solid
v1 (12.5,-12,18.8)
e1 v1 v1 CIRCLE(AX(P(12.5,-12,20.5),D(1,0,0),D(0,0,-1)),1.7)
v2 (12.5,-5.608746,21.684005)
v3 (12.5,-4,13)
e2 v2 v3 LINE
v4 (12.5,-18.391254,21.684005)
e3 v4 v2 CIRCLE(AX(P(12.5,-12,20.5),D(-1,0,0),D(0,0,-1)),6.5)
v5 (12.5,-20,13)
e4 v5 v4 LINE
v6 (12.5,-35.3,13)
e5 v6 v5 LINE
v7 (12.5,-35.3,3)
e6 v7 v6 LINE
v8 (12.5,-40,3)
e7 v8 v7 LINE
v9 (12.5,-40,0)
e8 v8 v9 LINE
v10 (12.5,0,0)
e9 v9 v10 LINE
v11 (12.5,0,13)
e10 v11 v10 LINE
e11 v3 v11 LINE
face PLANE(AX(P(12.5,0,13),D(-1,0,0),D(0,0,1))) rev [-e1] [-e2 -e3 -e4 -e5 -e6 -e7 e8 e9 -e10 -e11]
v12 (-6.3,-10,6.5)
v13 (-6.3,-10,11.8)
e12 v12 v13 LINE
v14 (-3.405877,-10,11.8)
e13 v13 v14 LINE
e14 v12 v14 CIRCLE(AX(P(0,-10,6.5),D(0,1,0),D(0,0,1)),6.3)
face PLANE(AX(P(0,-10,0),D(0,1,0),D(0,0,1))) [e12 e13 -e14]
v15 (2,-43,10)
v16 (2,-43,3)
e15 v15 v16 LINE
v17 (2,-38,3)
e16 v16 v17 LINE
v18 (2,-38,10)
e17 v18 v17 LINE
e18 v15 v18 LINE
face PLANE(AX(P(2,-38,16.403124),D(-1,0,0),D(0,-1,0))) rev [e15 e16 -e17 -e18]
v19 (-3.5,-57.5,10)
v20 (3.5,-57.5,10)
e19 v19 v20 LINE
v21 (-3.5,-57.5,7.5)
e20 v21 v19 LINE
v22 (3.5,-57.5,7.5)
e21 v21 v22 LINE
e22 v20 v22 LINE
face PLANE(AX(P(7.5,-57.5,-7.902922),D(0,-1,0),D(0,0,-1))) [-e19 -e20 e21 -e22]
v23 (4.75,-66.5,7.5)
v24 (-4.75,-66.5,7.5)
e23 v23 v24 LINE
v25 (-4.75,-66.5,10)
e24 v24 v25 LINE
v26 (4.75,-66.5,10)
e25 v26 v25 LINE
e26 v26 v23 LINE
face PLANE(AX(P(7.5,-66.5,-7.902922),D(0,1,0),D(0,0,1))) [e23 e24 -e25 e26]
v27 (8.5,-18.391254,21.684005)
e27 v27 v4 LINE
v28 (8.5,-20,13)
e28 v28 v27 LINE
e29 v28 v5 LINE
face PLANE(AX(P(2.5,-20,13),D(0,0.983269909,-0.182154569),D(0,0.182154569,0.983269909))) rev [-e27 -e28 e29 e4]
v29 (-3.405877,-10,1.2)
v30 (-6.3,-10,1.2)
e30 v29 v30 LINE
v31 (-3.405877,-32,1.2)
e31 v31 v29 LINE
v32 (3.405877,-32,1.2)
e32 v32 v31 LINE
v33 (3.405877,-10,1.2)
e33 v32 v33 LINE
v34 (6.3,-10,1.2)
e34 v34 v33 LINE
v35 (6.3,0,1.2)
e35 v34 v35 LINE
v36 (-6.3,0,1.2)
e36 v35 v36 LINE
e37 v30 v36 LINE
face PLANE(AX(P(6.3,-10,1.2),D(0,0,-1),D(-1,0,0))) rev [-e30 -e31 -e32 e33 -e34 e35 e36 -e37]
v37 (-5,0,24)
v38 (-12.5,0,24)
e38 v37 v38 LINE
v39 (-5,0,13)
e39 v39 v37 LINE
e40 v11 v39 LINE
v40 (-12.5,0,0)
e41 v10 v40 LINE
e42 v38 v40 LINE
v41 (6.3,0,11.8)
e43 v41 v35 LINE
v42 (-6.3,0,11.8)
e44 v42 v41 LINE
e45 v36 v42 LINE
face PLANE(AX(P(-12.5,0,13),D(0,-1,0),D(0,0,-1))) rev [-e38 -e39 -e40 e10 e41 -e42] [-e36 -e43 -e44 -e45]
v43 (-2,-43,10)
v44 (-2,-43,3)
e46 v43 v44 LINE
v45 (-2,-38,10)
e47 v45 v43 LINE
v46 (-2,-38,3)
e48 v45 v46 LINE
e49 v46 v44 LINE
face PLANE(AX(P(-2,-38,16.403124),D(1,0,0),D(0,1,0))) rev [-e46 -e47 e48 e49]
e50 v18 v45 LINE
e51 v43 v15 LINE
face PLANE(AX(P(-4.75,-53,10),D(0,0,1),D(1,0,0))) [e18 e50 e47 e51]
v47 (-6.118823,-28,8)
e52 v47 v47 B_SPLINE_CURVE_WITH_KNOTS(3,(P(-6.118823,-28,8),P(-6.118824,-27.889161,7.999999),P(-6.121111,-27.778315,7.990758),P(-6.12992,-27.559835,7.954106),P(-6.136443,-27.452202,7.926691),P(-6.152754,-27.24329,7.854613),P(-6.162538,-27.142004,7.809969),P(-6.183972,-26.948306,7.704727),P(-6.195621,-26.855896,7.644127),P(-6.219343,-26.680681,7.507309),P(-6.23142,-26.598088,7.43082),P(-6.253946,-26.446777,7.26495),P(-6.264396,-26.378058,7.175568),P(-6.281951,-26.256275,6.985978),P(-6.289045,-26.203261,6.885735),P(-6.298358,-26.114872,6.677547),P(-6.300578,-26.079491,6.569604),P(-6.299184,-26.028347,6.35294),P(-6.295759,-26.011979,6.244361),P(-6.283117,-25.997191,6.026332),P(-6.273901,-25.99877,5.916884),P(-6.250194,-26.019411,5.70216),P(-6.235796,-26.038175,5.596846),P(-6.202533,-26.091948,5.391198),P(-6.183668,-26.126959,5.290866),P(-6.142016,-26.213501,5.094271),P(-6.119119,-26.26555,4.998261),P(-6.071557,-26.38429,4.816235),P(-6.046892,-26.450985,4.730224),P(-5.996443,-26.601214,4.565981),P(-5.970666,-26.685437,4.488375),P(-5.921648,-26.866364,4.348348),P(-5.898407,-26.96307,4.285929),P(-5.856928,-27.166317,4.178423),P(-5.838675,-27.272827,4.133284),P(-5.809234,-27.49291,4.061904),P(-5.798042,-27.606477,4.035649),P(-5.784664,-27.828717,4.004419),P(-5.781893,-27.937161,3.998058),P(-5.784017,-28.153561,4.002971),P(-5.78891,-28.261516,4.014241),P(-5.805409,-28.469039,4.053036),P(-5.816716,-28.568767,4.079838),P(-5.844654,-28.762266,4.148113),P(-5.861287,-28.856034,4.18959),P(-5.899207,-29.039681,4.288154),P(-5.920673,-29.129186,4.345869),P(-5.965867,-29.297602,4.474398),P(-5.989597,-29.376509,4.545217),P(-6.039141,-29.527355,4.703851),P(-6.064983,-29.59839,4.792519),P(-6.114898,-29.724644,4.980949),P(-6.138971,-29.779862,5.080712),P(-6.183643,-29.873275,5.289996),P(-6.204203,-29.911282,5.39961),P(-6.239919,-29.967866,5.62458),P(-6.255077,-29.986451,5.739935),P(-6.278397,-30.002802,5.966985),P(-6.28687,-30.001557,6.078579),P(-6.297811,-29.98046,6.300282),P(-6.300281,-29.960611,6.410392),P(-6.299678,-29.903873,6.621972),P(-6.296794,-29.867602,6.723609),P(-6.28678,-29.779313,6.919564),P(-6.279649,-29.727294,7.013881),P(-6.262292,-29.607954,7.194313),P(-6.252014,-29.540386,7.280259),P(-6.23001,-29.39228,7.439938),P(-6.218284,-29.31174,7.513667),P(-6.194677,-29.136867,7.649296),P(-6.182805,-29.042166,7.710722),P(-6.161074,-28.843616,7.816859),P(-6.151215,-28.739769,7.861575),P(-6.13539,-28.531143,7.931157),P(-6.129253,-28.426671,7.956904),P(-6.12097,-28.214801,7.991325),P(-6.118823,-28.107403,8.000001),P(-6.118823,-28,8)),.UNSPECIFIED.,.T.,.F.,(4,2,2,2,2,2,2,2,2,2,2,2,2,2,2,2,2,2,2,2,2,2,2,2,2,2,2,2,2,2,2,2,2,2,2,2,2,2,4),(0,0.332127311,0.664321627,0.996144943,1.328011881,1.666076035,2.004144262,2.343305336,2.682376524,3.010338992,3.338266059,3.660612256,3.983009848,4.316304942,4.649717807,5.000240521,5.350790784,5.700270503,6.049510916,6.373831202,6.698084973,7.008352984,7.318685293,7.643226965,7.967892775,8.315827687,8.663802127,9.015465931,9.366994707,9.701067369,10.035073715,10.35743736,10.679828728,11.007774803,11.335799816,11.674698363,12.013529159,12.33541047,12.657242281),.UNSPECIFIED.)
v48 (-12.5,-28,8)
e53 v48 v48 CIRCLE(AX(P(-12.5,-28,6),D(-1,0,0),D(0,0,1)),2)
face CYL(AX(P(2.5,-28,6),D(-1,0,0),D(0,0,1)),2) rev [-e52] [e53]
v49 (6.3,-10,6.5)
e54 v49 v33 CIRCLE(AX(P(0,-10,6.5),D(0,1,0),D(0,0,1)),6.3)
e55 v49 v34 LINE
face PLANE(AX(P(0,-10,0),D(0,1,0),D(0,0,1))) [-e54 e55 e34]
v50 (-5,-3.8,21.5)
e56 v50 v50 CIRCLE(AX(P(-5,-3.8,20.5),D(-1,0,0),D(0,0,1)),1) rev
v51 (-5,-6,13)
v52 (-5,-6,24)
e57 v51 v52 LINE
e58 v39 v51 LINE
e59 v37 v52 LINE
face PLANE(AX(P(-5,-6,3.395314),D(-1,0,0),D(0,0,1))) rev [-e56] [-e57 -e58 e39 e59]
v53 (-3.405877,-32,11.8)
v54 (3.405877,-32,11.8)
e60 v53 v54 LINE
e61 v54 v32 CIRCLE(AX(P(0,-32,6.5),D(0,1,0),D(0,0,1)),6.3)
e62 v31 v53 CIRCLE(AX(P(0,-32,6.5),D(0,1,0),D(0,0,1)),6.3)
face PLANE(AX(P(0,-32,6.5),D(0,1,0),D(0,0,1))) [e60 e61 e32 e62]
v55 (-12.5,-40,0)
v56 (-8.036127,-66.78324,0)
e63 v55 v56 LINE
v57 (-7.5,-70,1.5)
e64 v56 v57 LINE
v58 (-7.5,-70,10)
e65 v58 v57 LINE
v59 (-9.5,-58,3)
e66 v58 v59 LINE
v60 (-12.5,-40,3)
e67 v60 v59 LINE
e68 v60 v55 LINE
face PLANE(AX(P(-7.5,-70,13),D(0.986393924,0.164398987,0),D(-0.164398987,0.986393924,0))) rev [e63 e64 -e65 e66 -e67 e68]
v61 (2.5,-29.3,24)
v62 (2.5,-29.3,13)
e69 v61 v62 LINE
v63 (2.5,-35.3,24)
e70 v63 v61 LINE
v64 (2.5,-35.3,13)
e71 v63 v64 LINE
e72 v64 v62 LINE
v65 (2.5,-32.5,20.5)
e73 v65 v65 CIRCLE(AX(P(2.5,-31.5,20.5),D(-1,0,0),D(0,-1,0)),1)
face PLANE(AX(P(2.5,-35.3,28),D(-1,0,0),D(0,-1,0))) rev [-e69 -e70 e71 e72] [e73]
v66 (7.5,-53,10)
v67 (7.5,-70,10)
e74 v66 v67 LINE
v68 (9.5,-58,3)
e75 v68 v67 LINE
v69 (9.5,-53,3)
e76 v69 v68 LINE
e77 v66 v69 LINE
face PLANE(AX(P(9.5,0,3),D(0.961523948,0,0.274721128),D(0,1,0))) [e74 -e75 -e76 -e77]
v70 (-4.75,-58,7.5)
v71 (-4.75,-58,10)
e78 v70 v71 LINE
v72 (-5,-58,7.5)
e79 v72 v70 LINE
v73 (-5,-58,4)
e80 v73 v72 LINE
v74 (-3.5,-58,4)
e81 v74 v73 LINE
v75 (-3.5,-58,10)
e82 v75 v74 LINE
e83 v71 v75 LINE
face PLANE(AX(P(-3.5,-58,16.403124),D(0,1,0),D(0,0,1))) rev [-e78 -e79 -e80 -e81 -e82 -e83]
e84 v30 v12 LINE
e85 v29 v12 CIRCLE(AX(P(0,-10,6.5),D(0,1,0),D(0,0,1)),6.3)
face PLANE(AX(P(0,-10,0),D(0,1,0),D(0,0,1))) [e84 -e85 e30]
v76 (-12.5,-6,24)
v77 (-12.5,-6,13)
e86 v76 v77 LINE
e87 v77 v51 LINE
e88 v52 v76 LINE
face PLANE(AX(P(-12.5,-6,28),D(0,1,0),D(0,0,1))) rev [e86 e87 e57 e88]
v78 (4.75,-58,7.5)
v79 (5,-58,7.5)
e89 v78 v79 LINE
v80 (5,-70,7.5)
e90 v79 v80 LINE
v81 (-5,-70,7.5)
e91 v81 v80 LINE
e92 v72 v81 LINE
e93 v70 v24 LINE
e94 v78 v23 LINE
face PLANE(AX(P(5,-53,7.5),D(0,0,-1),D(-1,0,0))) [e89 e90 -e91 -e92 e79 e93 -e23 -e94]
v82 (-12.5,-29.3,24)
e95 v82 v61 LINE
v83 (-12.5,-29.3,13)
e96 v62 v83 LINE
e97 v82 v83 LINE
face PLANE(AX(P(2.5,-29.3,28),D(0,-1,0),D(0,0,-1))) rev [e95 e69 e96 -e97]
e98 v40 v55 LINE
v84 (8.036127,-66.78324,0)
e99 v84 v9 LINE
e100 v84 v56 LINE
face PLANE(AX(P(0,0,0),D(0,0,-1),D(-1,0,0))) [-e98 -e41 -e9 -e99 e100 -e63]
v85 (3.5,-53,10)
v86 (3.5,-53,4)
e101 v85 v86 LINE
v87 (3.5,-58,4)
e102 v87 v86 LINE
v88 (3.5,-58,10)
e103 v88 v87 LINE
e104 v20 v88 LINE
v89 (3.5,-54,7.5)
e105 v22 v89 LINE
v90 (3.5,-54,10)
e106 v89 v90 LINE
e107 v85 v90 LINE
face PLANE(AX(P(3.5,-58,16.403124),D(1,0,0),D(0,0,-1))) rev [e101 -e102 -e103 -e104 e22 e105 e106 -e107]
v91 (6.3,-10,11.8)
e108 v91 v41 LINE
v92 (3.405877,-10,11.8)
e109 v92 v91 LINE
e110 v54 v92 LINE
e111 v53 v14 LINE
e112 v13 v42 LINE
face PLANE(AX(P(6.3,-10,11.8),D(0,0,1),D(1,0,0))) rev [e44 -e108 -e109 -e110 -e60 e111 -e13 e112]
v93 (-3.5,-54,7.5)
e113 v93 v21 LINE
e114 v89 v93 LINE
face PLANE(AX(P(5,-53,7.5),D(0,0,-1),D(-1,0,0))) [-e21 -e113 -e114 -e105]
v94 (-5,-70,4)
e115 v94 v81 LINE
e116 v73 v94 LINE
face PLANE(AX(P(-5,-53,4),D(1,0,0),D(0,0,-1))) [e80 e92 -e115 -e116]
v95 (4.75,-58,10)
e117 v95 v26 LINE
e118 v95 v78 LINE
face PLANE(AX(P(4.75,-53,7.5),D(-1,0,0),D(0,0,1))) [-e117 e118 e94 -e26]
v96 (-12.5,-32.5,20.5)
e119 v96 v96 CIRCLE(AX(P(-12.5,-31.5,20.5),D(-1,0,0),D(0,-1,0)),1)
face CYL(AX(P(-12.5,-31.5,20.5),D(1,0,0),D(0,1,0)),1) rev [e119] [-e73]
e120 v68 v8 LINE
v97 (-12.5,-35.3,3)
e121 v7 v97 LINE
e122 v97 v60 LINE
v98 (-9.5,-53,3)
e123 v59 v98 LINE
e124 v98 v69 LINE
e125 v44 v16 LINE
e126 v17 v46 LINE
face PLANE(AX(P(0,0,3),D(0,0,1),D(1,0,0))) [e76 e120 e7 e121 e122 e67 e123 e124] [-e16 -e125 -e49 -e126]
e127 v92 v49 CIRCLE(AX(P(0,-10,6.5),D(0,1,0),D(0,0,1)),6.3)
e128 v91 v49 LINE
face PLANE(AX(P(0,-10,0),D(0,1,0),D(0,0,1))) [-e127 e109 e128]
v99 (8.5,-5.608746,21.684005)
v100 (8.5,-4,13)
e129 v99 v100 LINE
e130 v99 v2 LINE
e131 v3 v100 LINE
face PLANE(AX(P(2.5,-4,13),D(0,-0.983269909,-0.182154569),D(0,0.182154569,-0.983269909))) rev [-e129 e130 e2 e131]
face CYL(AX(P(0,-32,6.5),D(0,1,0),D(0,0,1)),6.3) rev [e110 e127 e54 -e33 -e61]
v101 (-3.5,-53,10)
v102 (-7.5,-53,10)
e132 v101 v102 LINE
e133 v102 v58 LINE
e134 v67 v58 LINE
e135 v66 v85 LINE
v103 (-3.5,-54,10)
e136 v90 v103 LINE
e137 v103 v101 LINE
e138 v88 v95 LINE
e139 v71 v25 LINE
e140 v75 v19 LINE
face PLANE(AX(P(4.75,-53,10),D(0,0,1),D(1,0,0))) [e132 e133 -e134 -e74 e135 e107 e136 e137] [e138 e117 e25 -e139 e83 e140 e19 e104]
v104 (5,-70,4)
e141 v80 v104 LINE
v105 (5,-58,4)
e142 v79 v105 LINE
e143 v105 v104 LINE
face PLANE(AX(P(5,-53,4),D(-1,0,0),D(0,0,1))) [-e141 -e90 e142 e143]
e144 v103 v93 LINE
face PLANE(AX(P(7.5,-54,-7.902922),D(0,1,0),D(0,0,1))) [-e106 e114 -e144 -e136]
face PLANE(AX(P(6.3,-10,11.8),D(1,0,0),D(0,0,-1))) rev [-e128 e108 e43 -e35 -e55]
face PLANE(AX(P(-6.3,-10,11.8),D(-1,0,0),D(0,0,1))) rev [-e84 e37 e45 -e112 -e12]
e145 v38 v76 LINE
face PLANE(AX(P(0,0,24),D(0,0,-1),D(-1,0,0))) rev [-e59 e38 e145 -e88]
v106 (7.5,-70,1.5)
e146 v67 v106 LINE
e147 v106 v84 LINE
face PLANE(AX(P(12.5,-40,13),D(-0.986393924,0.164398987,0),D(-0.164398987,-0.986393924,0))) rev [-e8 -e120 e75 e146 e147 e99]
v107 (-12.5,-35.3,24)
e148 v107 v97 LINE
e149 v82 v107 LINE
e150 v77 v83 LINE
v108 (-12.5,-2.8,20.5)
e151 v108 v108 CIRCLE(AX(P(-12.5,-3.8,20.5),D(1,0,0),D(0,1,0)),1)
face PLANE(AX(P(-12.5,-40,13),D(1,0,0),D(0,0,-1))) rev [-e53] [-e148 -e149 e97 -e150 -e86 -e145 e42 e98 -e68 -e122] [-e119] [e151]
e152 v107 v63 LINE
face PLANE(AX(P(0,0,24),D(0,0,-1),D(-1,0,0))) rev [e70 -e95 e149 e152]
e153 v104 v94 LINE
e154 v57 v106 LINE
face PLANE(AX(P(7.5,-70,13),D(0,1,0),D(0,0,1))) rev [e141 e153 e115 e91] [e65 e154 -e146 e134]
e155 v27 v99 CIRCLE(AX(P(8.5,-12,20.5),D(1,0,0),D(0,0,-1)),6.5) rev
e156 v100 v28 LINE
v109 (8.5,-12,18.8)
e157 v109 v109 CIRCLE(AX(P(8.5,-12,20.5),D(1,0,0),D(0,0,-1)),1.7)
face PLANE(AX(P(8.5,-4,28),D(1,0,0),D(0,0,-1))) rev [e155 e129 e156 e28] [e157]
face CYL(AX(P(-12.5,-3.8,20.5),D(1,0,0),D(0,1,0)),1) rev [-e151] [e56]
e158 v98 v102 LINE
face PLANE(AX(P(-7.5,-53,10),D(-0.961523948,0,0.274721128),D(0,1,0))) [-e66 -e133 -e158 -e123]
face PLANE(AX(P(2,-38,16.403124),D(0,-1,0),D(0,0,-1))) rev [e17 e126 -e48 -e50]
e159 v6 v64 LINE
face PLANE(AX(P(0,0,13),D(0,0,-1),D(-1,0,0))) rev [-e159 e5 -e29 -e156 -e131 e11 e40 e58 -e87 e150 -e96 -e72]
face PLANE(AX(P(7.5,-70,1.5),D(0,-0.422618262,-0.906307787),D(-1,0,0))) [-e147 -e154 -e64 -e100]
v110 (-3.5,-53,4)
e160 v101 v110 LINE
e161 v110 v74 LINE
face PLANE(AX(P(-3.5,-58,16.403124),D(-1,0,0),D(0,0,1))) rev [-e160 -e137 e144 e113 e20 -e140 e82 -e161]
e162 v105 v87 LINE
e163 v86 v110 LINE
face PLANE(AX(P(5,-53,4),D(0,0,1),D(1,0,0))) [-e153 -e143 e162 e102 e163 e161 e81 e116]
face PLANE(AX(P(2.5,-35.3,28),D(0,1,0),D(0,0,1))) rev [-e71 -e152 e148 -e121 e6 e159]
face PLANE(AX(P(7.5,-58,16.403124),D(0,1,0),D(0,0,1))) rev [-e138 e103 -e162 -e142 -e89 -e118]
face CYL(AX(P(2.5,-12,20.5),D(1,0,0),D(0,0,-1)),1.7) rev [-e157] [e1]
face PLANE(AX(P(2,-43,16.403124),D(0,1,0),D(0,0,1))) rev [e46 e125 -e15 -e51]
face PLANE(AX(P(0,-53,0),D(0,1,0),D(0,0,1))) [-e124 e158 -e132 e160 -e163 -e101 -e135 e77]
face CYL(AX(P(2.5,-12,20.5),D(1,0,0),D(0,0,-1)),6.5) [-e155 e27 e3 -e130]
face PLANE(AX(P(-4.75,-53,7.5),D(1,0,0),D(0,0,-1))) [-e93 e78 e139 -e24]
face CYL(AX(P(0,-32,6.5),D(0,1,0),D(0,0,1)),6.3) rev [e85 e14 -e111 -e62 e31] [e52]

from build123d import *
from OCP.BRepFilletAPI import BRepFilletAPI_MakeChamfer

# Parameters (mm, degrees)
RESSALTO_EXTRUS_O1_DEPTH = 13
ESBO_O2_W                = 15
ESBO_O2_H                = 6
ESBO_O2_W_2              = 4
ESBO_O2_H_2              = 16
RESSALTO_EXTRUS_O2_DEPTH = 15
ESBO_O3_R                = 1
CORTE_EXTRUS_O1_DEPTH    = 77.870020164
ESBO_O10_R               = 1.7
CORTE_EXTRUS_O4_DEPTH    = 10
ESBO_O11_W               = 25
ESBO_O11_H               = 34.7
CORTE_EXTRUS_O5_DEPTH    = 10
RESSALTO_EXTRUS_O3_DEPTH = 17
RESSALTO_EXTRUS_O4_REACH = 77.374
ESBO_O7_W                = 4
ESBO_O7_H                = 5
ESBO_O8_W                = 15
ESBO_O8_H                = 3.5
RESSALTO_EXTRUS_O5_DEPTH = 2.5
CHANFRO2_SIZE            = 2
CHANFRO2_SIZE_2          = 7
CHANFRO3_SIZE            = 1.5
CHANFRO3_SIZE2           = 3.216760381
ESBO_O12_W               = 12.6
ESBO_O12_H               = 10.6
CORTE_EXTRUS_O6_DEPTH    = 10
CORTE_EXTRUS_O7_DEPTH    = 22
ESBO_O15_R               = 2
CORTE_EXTRUS_O9_DEPTH    = 15
ESBO_O17_W               = 15
ESBO_O17_H               = 35.3
CORTE_EXTRUS_O10_DEPTH   = 4
ESBO_O18_W               = 7.5
ESBO_O18_H               = 6
CORTE_EXTRUS_O11_DEPTH   = 11


with BuildPart() as part:
    # Esboço1 → Ressalto-extrusão1 (new body)
    with BuildSketch(Plane.XY):
        Polygon((-12.5, 0), (12.5, 0), (12.5, -40), (7.5, -70), (-7.5, -70), (-12.5, -40), align=None)
    extrude(amount=RESSALTO_EXTRUS_O1_DEPTH)

    # Esboço2 → Ressalto-extrusão2 (add)
    with BuildSketch(Plane.XY.offset(13)):
        with Locations((-5, -32.3)):
            Rectangle(ESBO_O2_W, ESBO_O2_H)
        with Locations((-5, -3)):
            Rectangle(ESBO_O2_W, ESBO_O2_H)
        with Locations((10.5, -12)):
            Rectangle(ESBO_O2_W_2, ESBO_O2_H_2)
    extrude(amount=RESSALTO_EXTRUS_O2_DEPTH)

    # Esboço3 → Corte-extrusão1 (cut, through all)
    with BuildSketch(Plane(origin=(2.5, 0, 0), x_dir=(0, 0, -1), z_dir=(1, 0, 0))):
        with Locations(Location((-20.5, -3.8, 0), (0, 0, 90))):
            Circle(ESBO_O3_R)
        with Locations(Location((-20.5, -31.5, 0), (0, 0, 270))):
            Circle(ESBO_O3_R)
    extrude(amount=-CORTE_EXTRUS_O1_DEPTH, mode=Mode.SUBTRACT)

    # Esboço10 → Corte-extrusão4 (cut)
    with BuildSketch(Plane(origin=(12.5, 0, 0), x_dir=(0, 0, -1), z_dir=(1, 0, 0))):
        with Locations((-20.5, -12)):
            Circle(ESBO_O10_R)
        with BuildLine():
            Line((-13, -4), (-28, -4))
            Line((-28, -4), (-28, -20))
            Line((-28, -20), (-13, -20))
            Line((-13, -20), (-21.684004699, -18.391254405))
            ThreePointArc((-21.684004699, -18.391254405), (-27, -12), (-21.684004699, -5.608745595))
            Line((-21.684004699, -5.608745595), (-13, -4))
        make_face()
    extrude(amount=-CORTE_EXTRUS_O4_DEPTH, mode=Mode.SUBTRACT)

    # Esboço11 → Corte-extrusão5 (cut)
    with BuildSketch(Plane.XY.offset(13)):
        with Locations((0, -52.65)):
            Rectangle(ESBO_O11_W, ESBO_O11_H)
    extrude(amount=-CORTE_EXTRUS_O5_DEPTH, mode=Mode.SUBTRACT)

    # Esboço6 → Ressalto-extrusão3 (add)
    with BuildSketch(Plane.XZ.offset(70)):
        Polygon((-5, 4), (-5, 7.5), (-4.75, 7.5), (-4.75, 10), (-7.5, 10), (-7.5, 3), (7.5, 3), (7.5, 10), (4.75, 10), (4.75, 7.5), (5, 7.5), (5, 4), align=None)
    extrude(amount=-RESSALTO_EXTRUS_O3_DEPTH)

    # Ressalto-extrusão4: up to this face of the body (flat: up to its plane)
    ressalto_extrus_o4_end = Plane(part.part.faces().sort_by_distance((-6.125, -61.5, 10))[0])
    # Esboço7 → Ressalto-extrusão4 (add, up to the picked face)
    with BuildSketch(Plane.XY.offset(3), mode=Mode.PRIVATE) as ressalto_extrus_o4_sk1:
        with Locations((0, -40.5)):
            Rectangle(ESBO_O7_W, ESBO_O7_H)
    ressalto_extrus_o4_tool1 = split(extrude(ressalto_extrus_o4_sk1.sketch, amount=RESSALTO_EXTRUS_O4_REACH, mode=Mode.PRIVATE), bisect_by=ressalto_extrus_o4_end, keep=Keep.BOTH, mode=Mode.PRIVATE)
    # Esboço7 → Ressalto-extrusão4 (add, up to the picked face)
    with BuildSketch(Plane.XY.offset(3), mode=Mode.PRIVATE) as ressalto_extrus_o4_sk2:
        with Locations((5.5, -55.5)):
            Rectangle(ESBO_O7_W, ESBO_O7_H)
    ressalto_extrus_o4_tool2 = split(extrude(ressalto_extrus_o4_sk2.sketch, amount=RESSALTO_EXTRUS_O4_REACH, mode=Mode.PRIVATE), bisect_by=ressalto_extrus_o4_end, keep=Keep.BOTH, mode=Mode.PRIVATE)
    # Esboço7 → Ressalto-extrusão4 (add, up to the picked face)
    with BuildSketch(Plane.XY.offset(3), mode=Mode.PRIVATE) as ressalto_extrus_o4_sk3:
        with Locations((-5.5, -55.5)):
            Rectangle(ESBO_O7_W, ESBO_O7_H)
    ressalto_extrus_o4_tool3 = split(extrude(ressalto_extrus_o4_sk3.sketch, amount=RESSALTO_EXTRUS_O4_REACH, mode=Mode.PRIVATE), bisect_by=ressalto_extrus_o4_end, keep=Keep.BOTH, mode=Mode.PRIVATE)
    add(ressalto_extrus_o4_tool1.solids().sort_by(Axis((0, -40.5, 3), (0, 0, 1)))[0])
    add(ressalto_extrus_o4_tool2.solids().sort_by(Axis((5.5, -55.5, 3), (0, 0, 1)))[0])
    add(ressalto_extrus_o4_tool3.solids().sort_by(Axis((-5.5, -55.5, 3), (0, 0, 1)))[0])

    # Esboço8 → Ressalto-extrusão5 (add)
    with BuildSketch(Plane.XY.offset(10)):
        with Locations((0, -68.25)):
            Rectangle(ESBO_O8_W, ESBO_O8_H)
        with Locations((0, -55.75)):
            Rectangle(ESBO_O8_W, ESBO_O8_H)
    extrude(amount=-RESSALTO_EXTRUS_O5_DEPTH)

    # Chanfro2
    chanfro2_edges_1 = [part.edges().sort_by_distance(p)[0] for p in [
        (7.5, -61.5, 3),
    ]]
    chanfro2_side_1 = [part.faces().sort_by_distance(p)[0] for p in [
        (7.54, -61.5, 3),
    ]]
    chanfro2_edges_2 = [part.edges().sort_by_distance(p)[0] for p in [
        (-7.5, -61.5, 3),
    ]]
    chanfro2_side_2 = [part.faces().sort_by_distance(p)[0] for p in [
        (-7.54, -61.5, 3),
    ]]
    chanfro2 = BRepFilletAPI_MakeChamfer(part.part.solid().wrapped)
    for e in chanfro2_edges_1:
        chanfro2.Add(CHANFRO2_SIZE - 0.0001, CHANFRO2_SIZE_2 - 0.0001, e.wrapped, chanfro2_side_1[0].wrapped)
    for e in chanfro2_edges_2:
        chanfro2.Add(CHANFRO2_SIZE - 0.0001, CHANFRO2_SIZE_2 - 0.0001, e.wrapped, chanfro2_side_2[0].wrapped)
    add(Compound.cast(chanfro2.Shape()), mode=Mode.REPLACE)  # a hair under: the kernel refuses the full size

    # Chanfro3
    chanfro3_edges = [part.edges().sort_by_distance(p)[0] for p in [
        (0, -70, 0),
    ]]
    chanfro3_side = [part.faces().sort_by_distance(p)[0] for p in [
        (7.319722436, -70, 9.99995),
    ]]
    chamfer(chanfro3_edges, length=CHANFRO3_SIZE, length2=CHANFRO3_SIZE2, reference=chanfro3_side[0])

    # Esboço12 → Corte-extrusão6 (cut)
    with BuildSketch(Plane(origin=(0, 0, 0), x_dir=(1, 0, 0), z_dir=(0, 1, 0))):
        with Locations((0, -6.5)):
            Rectangle(ESBO_O12_W, ESBO_O12_H)
    extrude(amount=-CORTE_EXTRUS_O6_DEPTH, mode=Mode.SUBTRACT)

    # Esboço13 → Corte-extrusão7 (cut)
    with BuildSketch(Plane(origin=(0, -10, 0), x_dir=(1, 0, 0), z_dir=(0, 1, 0))):
        with BuildLine():
            Line((-3.405877273, -11.8), (3.405877273, -11.8))
            ThreePointArc((3.405877273, -11.8), (6.3, -6.5), (3.405877273, -1.2))
            Line((3.405877273, -1.2), (-3.405877273, -1.2))
            ThreePointArc((-3.405877273, -1.2), (-6.3, -6.5), (-3.405877273, -11.8))
        make_face()
    extrude(amount=-CORTE_EXTRUS_O7_DEPTH, mode=Mode.SUBTRACT)

    # Esboço15 → Corte-extrusão9 (cut)
    with BuildSketch(Plane.ZY.offset(12.5)):
        with Locations((6, -28)):
            Circle(ESBO_O15_R)
    extrude(amount=-CORTE_EXTRUS_O9_DEPTH, mode=Mode.SUBTRACT)

    # Esboço17 → Corte-extrusão10 (cut)
    with BuildSketch(Plane.XY.offset(28)):
        with Locations((-5, -17.65)):
            Rectangle(ESBO_O17_W, ESBO_O17_H)
    extrude(amount=-CORTE_EXTRUS_O10_DEPTH, mode=Mode.SUBTRACT)

    # Esboço18 → Corte-extrusão11 (cut)
    with BuildSketch(Plane.XY.offset(24)):
        with Locations((-1.25, -3)):
            Rectangle(ESBO_O18_W, ESBO_O18_H)
    extrude(amount=-CORTE_EXTRUS_O11_DEPTH, mode=Mode.SUBTRACT)


solid = part.part
